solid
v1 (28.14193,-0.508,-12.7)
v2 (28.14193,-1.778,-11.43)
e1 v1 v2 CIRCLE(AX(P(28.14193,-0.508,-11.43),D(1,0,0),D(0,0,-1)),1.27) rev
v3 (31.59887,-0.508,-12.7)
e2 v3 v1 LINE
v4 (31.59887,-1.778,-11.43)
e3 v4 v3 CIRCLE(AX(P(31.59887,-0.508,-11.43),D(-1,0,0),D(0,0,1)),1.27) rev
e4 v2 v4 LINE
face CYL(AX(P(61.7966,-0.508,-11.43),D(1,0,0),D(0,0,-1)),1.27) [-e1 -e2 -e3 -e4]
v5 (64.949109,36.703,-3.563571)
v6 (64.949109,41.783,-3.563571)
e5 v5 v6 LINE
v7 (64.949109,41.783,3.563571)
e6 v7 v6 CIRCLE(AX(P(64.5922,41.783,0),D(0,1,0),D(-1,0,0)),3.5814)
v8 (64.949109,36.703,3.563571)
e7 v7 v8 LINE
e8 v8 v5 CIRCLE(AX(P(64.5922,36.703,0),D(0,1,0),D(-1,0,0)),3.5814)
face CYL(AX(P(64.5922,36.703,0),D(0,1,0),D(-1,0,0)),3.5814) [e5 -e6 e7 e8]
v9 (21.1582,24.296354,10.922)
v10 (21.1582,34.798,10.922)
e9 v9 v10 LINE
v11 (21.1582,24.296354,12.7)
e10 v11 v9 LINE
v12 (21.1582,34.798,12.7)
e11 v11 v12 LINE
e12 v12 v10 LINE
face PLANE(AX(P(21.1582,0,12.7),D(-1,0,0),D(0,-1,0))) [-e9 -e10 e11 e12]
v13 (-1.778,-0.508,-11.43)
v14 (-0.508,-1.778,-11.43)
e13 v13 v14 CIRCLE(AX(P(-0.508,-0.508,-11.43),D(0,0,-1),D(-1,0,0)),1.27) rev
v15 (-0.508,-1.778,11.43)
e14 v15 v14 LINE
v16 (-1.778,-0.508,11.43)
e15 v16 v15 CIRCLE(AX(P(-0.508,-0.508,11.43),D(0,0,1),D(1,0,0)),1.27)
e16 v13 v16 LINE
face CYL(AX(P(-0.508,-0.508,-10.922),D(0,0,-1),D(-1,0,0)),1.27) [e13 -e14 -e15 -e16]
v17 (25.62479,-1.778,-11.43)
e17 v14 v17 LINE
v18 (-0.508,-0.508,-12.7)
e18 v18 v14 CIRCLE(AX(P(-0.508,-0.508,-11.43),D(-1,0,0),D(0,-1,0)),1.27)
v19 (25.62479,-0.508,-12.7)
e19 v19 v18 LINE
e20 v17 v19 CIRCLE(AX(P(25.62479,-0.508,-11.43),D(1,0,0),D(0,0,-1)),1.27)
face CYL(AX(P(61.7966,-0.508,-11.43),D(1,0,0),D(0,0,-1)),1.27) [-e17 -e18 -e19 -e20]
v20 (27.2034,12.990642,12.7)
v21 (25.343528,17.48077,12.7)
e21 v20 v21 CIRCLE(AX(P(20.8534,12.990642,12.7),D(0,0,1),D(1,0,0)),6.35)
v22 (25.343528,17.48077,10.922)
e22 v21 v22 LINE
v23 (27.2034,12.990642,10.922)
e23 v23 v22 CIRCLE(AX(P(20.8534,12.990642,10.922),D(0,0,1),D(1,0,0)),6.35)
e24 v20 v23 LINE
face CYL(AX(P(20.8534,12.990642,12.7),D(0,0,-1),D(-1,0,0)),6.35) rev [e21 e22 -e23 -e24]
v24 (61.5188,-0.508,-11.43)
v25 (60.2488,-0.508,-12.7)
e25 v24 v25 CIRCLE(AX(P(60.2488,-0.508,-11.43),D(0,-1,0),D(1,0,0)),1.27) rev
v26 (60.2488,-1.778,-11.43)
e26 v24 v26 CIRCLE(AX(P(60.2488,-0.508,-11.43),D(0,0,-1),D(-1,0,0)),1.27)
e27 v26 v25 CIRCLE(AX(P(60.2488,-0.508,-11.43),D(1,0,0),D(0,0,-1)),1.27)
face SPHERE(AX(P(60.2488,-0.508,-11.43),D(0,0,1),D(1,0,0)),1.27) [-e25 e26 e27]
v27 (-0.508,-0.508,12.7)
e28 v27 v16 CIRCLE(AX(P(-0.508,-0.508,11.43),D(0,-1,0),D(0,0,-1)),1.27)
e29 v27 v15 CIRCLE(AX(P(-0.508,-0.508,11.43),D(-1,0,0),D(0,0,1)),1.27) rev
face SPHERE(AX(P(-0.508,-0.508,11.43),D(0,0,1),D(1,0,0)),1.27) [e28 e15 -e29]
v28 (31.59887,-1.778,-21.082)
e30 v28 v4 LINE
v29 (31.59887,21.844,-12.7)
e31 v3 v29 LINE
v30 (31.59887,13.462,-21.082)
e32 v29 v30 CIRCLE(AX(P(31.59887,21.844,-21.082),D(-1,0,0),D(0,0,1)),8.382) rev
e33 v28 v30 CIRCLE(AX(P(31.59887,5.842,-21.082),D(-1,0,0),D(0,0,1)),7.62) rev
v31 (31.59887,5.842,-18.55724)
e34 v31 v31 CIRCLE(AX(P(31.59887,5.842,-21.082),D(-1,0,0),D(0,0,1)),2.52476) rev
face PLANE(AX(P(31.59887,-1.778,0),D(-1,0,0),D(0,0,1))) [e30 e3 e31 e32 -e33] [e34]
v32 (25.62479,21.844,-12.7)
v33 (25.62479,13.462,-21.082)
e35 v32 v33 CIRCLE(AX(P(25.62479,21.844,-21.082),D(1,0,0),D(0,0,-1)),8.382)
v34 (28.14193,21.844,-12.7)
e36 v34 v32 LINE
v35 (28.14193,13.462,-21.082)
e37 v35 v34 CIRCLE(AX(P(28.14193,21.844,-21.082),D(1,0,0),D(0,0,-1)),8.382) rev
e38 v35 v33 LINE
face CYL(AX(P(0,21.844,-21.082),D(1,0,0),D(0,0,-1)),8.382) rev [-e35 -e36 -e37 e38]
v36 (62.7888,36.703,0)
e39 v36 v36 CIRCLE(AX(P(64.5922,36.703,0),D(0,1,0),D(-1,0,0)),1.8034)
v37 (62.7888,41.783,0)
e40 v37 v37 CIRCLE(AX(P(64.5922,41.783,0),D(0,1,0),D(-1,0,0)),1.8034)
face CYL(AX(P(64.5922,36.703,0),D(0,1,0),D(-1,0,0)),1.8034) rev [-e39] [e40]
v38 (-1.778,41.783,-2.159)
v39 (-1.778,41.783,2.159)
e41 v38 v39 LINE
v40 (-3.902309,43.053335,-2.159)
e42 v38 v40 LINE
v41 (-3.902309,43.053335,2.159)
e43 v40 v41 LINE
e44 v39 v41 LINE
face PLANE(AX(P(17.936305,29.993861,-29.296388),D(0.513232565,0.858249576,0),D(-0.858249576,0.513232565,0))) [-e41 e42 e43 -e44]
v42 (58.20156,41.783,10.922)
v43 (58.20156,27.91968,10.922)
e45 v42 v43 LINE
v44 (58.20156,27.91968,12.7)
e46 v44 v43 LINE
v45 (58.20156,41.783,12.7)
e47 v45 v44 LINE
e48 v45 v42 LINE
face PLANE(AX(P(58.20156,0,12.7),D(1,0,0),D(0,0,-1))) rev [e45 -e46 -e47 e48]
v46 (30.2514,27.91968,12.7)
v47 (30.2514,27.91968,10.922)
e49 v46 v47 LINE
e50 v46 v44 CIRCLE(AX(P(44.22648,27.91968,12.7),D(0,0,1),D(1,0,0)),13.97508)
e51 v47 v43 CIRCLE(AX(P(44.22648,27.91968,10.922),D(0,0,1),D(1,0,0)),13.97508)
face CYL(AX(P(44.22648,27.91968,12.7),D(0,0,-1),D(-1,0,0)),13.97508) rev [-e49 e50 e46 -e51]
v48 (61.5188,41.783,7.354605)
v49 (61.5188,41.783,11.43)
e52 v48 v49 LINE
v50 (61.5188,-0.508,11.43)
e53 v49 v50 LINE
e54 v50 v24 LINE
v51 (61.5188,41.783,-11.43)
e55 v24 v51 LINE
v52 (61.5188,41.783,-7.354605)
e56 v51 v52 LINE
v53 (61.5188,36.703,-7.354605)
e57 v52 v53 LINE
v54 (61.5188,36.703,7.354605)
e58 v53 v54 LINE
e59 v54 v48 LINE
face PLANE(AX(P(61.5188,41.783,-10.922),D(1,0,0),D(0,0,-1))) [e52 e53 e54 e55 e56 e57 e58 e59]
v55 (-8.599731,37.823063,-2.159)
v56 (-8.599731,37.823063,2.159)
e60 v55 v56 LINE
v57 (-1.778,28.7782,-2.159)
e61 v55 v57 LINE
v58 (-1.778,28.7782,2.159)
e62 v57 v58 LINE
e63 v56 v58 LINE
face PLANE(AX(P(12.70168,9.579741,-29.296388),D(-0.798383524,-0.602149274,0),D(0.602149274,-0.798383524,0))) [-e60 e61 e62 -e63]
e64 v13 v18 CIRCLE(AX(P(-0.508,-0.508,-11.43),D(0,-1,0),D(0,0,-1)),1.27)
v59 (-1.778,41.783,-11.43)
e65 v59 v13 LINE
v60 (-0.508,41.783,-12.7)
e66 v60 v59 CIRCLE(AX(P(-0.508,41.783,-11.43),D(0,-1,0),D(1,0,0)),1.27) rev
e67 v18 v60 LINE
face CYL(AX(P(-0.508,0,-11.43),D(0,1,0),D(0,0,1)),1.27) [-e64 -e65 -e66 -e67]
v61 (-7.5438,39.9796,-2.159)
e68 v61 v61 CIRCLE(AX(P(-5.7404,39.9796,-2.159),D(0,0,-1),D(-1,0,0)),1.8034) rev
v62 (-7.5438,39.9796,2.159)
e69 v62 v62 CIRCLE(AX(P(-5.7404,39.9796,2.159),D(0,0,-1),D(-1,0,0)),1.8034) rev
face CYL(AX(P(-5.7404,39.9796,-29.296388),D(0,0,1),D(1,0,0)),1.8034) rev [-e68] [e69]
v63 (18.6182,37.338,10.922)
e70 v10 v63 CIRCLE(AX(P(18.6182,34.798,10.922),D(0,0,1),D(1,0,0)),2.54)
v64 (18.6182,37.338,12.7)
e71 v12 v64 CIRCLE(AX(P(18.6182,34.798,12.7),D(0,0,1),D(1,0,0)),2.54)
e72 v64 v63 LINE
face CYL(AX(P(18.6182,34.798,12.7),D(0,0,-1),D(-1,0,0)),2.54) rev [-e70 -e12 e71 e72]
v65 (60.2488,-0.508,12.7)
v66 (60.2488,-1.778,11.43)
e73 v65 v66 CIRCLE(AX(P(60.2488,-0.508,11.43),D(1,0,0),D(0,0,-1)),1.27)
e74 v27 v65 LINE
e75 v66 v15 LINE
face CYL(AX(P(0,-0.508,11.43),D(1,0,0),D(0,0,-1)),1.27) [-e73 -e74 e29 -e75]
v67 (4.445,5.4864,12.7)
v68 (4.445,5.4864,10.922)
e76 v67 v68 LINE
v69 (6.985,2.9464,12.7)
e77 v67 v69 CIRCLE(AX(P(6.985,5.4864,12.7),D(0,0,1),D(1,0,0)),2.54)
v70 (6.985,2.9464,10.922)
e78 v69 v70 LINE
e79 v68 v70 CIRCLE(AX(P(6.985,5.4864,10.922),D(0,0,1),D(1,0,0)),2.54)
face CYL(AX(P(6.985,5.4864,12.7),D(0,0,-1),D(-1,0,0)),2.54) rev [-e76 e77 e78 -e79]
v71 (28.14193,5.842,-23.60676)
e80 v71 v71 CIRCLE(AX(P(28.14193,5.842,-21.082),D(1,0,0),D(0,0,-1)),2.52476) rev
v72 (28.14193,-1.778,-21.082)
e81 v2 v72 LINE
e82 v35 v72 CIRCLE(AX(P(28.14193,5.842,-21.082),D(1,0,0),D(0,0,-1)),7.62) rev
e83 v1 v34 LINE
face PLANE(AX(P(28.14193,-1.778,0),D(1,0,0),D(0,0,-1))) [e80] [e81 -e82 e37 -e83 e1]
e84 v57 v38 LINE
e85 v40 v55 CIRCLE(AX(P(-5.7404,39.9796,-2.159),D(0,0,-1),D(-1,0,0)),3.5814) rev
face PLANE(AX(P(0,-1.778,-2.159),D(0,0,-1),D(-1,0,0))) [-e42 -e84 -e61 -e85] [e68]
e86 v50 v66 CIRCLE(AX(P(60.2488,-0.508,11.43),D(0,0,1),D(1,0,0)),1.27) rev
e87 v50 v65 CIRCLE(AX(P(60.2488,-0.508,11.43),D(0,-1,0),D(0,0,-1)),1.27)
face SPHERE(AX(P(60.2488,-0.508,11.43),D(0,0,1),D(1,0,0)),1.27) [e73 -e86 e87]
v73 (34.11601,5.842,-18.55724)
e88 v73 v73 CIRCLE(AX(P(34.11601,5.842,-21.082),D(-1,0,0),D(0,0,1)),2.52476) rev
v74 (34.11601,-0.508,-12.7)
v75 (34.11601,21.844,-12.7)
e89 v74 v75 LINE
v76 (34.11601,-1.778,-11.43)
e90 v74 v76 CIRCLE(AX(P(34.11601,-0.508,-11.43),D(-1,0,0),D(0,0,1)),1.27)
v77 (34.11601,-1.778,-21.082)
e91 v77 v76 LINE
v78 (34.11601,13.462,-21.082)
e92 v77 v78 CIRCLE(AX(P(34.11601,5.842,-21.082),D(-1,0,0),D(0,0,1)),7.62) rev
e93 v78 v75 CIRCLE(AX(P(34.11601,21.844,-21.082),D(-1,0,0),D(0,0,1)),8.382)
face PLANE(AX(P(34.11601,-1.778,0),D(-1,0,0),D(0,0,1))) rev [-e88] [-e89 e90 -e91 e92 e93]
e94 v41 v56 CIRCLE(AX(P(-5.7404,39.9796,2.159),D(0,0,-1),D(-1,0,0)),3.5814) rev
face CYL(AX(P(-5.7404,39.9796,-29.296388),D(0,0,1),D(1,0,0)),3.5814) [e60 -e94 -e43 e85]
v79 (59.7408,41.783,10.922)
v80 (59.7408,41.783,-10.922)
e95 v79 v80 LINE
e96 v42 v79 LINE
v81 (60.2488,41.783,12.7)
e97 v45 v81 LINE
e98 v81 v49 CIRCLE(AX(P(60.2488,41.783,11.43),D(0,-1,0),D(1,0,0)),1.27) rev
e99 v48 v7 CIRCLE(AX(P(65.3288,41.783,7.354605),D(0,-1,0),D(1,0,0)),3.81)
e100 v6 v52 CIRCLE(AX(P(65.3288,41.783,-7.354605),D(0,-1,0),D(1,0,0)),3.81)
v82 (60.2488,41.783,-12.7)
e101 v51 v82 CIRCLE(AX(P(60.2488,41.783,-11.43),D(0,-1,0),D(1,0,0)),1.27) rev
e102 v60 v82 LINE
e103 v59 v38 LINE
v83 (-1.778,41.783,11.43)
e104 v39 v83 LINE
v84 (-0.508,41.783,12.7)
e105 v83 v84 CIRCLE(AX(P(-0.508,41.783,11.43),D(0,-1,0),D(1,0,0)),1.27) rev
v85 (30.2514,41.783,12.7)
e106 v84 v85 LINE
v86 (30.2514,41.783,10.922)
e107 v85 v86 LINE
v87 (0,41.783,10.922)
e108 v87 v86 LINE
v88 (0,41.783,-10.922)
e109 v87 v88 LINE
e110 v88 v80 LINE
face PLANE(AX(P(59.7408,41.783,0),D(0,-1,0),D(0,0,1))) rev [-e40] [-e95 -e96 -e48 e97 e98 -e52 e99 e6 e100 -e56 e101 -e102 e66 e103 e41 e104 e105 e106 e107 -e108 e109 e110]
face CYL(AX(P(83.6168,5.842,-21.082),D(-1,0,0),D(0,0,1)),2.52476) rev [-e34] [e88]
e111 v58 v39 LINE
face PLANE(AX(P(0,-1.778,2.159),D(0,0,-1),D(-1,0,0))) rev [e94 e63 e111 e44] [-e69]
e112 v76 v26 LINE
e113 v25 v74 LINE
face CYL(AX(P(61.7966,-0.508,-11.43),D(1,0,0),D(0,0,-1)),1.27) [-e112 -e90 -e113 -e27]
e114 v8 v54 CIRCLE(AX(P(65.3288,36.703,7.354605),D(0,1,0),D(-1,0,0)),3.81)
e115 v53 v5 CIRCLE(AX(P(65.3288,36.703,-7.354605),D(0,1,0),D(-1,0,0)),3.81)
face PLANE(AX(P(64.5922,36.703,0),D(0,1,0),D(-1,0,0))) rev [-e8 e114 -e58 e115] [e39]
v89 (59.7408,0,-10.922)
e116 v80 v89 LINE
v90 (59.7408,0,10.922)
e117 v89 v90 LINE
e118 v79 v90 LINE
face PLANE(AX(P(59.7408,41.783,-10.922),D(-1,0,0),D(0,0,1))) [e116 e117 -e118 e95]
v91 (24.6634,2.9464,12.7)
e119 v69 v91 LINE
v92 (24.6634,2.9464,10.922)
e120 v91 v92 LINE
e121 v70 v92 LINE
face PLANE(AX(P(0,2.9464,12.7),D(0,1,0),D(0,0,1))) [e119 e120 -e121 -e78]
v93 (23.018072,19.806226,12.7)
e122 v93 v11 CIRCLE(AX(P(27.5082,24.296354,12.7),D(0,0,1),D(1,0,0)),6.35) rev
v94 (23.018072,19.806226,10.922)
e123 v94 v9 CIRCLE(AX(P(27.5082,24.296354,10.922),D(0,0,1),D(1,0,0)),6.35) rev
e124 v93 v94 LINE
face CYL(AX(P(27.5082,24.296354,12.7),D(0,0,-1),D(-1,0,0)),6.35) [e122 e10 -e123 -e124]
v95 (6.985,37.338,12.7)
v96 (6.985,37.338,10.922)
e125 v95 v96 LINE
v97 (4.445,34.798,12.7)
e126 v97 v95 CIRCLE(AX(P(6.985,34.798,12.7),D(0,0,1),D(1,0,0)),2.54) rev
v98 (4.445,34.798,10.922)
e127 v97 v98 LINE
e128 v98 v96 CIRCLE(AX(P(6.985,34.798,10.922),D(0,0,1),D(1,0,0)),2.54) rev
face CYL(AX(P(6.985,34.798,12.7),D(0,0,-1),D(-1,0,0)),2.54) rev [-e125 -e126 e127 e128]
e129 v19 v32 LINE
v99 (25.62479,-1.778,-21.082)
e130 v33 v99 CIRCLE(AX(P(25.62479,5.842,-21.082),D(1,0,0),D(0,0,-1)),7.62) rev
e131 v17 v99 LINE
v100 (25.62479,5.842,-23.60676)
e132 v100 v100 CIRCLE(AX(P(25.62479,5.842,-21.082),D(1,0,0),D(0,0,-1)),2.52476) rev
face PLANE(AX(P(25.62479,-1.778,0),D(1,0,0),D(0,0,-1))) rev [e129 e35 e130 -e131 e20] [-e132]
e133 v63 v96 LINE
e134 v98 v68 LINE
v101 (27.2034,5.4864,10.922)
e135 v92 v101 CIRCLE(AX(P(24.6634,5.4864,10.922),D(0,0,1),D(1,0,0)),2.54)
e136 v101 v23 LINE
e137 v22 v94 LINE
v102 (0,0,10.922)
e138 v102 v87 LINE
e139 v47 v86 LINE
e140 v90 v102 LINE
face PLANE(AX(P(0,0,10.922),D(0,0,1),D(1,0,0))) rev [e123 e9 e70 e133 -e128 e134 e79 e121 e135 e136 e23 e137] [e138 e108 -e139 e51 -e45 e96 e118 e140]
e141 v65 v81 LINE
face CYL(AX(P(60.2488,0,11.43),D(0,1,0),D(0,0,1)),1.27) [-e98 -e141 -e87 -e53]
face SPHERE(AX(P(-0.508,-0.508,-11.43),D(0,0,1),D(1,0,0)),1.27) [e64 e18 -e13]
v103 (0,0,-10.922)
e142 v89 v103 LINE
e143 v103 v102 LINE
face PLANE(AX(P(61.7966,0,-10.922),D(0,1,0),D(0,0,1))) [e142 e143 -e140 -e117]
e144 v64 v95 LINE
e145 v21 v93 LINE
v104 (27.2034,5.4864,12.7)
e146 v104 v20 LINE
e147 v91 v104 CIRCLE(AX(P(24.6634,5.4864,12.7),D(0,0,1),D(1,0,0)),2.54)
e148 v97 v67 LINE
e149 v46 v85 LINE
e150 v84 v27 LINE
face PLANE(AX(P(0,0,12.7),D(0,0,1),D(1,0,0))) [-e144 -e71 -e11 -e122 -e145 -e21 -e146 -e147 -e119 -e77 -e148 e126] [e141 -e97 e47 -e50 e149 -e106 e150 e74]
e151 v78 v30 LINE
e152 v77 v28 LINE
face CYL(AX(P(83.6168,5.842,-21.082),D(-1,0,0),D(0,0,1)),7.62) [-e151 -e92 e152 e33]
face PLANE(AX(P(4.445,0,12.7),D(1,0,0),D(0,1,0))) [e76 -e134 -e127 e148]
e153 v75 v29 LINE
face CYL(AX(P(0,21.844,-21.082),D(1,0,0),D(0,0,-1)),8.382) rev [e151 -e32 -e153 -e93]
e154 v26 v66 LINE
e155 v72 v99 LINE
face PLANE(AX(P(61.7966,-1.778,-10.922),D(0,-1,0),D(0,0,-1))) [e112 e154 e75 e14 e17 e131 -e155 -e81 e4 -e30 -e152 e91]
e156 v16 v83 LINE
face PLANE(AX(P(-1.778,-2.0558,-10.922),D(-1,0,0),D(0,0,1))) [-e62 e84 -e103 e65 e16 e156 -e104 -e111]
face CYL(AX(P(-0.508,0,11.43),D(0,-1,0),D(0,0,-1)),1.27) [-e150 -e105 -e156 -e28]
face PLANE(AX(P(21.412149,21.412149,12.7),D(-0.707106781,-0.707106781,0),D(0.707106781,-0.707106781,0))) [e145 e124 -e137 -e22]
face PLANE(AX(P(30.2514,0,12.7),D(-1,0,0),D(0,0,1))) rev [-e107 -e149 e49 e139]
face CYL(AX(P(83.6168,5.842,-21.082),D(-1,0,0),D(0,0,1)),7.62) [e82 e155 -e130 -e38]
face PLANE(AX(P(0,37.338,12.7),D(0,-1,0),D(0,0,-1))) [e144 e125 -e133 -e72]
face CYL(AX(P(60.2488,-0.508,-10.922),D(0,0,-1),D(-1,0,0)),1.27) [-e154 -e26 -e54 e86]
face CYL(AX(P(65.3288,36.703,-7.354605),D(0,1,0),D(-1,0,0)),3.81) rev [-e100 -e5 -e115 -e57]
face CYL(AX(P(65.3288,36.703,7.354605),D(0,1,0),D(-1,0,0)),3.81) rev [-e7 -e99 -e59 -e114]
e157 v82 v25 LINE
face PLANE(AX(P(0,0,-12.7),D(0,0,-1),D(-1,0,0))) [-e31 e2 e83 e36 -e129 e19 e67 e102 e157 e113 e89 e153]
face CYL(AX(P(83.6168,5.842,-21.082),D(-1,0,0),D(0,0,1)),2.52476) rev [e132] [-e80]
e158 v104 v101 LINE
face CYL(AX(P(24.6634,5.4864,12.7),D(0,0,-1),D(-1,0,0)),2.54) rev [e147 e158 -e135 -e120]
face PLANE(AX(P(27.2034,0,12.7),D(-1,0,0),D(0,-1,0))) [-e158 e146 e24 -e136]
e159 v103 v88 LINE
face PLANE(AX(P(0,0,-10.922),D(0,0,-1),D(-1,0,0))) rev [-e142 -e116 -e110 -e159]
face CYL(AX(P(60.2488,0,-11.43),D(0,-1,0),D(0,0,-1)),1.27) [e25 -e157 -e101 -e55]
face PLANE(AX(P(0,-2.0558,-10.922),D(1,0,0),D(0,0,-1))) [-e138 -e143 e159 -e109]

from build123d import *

# Parameters (mm, degrees)
SKETCH3_W               = 1.778
SKETCH3_H               = 21.844
SKETCH4_W               = 63.2968
SKETCH4_H               = 43.561
BOSS_EXTRUDE1_DEPTH     = 1.778
BOSS_EXTRUDE2_DEPTH     = 1.778
SKETCH6_R               = 1.8034
BOSS_EXTRUDE3_DEPTH     = 5.08
FILLET2_R               = 3.81
SKETCH7_R               = 1.8034
BOSS_EXTRUDE4_DEPTH     = 25.4
CUT_EXTRUDE1_DEPTH      = 82.893164904
CUT_EXTRUDE1_DEPTH_BACK = 82.893164904
SKETCH8_W               = 7.5438
SKETCH8_H               = 10.541
SKETCH13_R              = 2.52476
BOSS_EXTRUDE5_DEPTH     = 63.2968
SKETCH14_W              = 27.40279
SKETCH14_H              = 7.62
SKETCH14_H_2            = 8.382
SKETCH14_W_2            = 3.45694
CUT_EXTRUDE2_DEPTH      = 80.858589657
FILLET3_R               = 8.382
FILLET4_R               = 1.27


# Some blends are built 0.0001 mm under size
with BuildPart() as part:
    # Sweep1: sweep along a path in Sketch1
    with BuildLine(Plane.XY) as sweep1_path:
        Line((0, 41.783), (0, 0))
        Line((0, 0), (59.7408, 0))
        Line((59.7408, 0), (59.7408, 41.783))
    # Sketch3 → Sweep1 (sweep)
    with BuildSketch(Plane(origin=(0, 41.783, 0), x_dir=(1, 0, 0), z_dir=(0, 1, 0))):
        with Locations((-0.889, 0)):
            Rectangle(SKETCH3_W, SKETCH3_H)
    sweep(path=sweep1_path.line, transition=Transition.RIGHT)

    # Sketch4 → Boss-Extrude1 (add)
    with BuildSketch(Plane(origin=(0, 0, -10.922), x_dir=(-1, 0, 0), z_dir=(0, 0, -1))):
        with Locations((-29.8704, 20.0025)):
            Rectangle(SKETCH4_W, SKETCH4_H)
    extrude(amount=BOSS_EXTRUDE1_DEPTH)

    # Sketch5 → Boss-Extrude2 (add)
    # profile 1 of 2: a face of its own
    with BuildSketch(Plane.XY.offset(10.922)):
        with BuildLine():
            Line((30.2514, 41.783), (0, 41.783))
            Line((0, 41.783), (0, 0))
            Line((0, 0), (59.7408, 0))
            Line((59.7408, 0), (59.7408, 41.783))
            Line((59.7408, 41.783), (58.20156, 41.783))
            Line((58.20156, 41.783), (58.20156, 27.91968))
            ThreePointArc((58.20156, 27.91968), (44.22648, 13.9446), (30.2514, 27.91968))
            Line((30.2514, 27.91968), (30.2514, 41.783))
        make_face()
        with BuildLine():
            Line((4.445, 5.4864), (4.445, 34.798))
            ThreePointArc((4.445, 34.798), (5.188948776, 36.594051224), (6.985, 37.338))
            Line((6.985, 37.338), (18.6182, 37.338))
            ThreePointArc((18.6182, 37.338), (20.414251224, 36.594051224), (21.1582, 34.798))
            Line((21.1582, 34.798), (21.1582, 24.296354404))
            ThreePointArc((21.1582, 24.296354404), (21.641564969, 21.866314608), (23.018071939, 19.806226343))
            Line((23.018071939, 19.806226343), (25.343528061, 17.480770222))
            ThreePointArc((25.343528061, 17.480770222), (26.720035031, 15.420681957), (27.2034, 12.990642162))
            Line((27.2034, 12.990642162), (27.2034, 5.4864))
            ThreePointArc((27.2034, 5.4864), (26.459451224, 3.690348776), (24.6634, 2.9464))
            Line((24.6634, 2.9464), (6.985, 2.9464))
            ThreePointArc((6.985, 2.9464), (5.188948776, 3.690348776), (4.445, 5.4864))
        make_face(mode=Mode.SUBTRACT)
    # profile 2 of 2: a face of its own
    with BuildSketch(Plane.XY.offset(10.922)):
        Polygon((61.5188, 41.783), (59.7408, 41.783), (59.7408, 0), (0, 0), (0, 41.783), (-1.778, 41.783), (-1.778, -1.778), (61.5188, -1.778), align=None)
    extrude(amount=BOSS_EXTRUDE2_DEPTH)

    # Sketch6 → Boss-Extrude3 (add)
    with BuildSketch(Plane(origin=(0, 41.783, 0), x_dir=(1, 0, 0), z_dir=(0, 1, 0))):
        with BuildLine():
            Line((64.5922, 3.5814), (61.5188, 3.5814))
            Line((61.5188, 3.5814), (61.5188, -3.5814))
            Line((61.5188, -3.5814), (64.5922, -3.5814))
            ThreePointArc((64.5922, -3.5814), (68.1736, 0), (64.5922, 3.5814))
        make_face()
        with Locations(Location((64.5922, 0, 0), (0, 0, 180))):
            Circle(SKETCH6_R, mode=Mode.SUBTRACT)
    extrude(amount=-BOSS_EXTRUDE3_DEPTH)

    # Fillet2
    # the kernel refuses this fillet: 3.81 mm, written as the material it adds along each edge
    with BuildSketch(Plane(origin=(61.5188, 41.783, -3.5814), x_dir=(0, 0, -1), z_dir=(0, -1, 0))) as fillet2_piece_1:
        with BuildLine():
            CenterArc((3.773204979, 3.81), FILLET2_R, 185.719382358, 84.280617642)
            Line((-0.017828515, 3.430309278), (-0.396931865, 3.392340206))
            ThreePointArc((-0.396931865, 3.392340206), (-0.381, 3.0734), (-0.381, 0))
            Line((-0.381, 0), (0, -0.381))
            Line((0, -0.381), (3.773204979, -0.381))
            Line((3.773204979, -0.381), (3.773204979, 0))
        make_face()
    extrude(amount=5.08)
    with BuildSketch(Plane(origin=(61.5188, 41.783, 3.5814), x_dir=(0, 0, 1), z_dir=(0, -1, 0))) as fillet2_piece_2:
        with BuildLine():
            CenterArc((3.773204979, -3.81), FILLET2_R, 90, 84.280617642)
            Line((-0.017828515, -3.430309278), (-0.396931865, -3.392340206))
            ThreePointArc((-0.396931865, -3.392340206), (-0.381, -3.0734), (-0.381, 0))
            Line((-0.381, 0), (0, 0.381))
            Line((0, 0.381), (3.773204979, 0.381))
            Line((3.773204979, 0.381), (3.773204979, 0))
        make_face()
    extrude(amount=5.08)

    # Sketch7 → Boss-Extrude4 (add)
    with BuildSketch(Plane.XY.offset(12.7)):
        with BuildLine():
            Line((-1.778, 36.3982), (-1.778, 41.783))
            Line((-1.778, 41.783), (-3.902308892, 43.053335031))
            ThreePointArc((-3.902308892, 43.053335031), (-8.404920605, 42.372664125), (-8.599730754, 37.82306259))
            Line((-8.599730754, 37.82306259), (-1.778, 28.7782))
            Line((-1.778, 28.7782), (-1.778, 36.3982))
        make_face()
        with Locations((-5.7404, 39.9796)):
            Circle(SKETCH7_R, mode=Mode.SUBTRACT)
    extrude(amount=-BOSS_EXTRUDE4_DEPTH)

    # Sketch8 → Cut-Extrude1 (cut, two sides: drawn at the far end of the back side and taken through both)
    with BuildSketch(Plane(origin=(0, 41.783, 0), x_dir=(1, 0, 0), z_dir=(0, 1, 0)).offset(-CUT_EXTRUDE1_DEPTH_BACK)):
        with Locations((-5.5499, 7.4295)):
            Rectangle(SKETCH8_W, SKETCH8_H)
        with Locations((-5.5499, -7.4295)):
            Rectangle(SKETCH8_W, SKETCH8_H)
    extrude(amount=CUT_EXTRUDE1_DEPTH + CUT_EXTRUDE1_DEPTH_BACK, mode=Mode.SUBTRACT)

    # Sketch13 → Boss-Extrude5 (add)
    with BuildSketch(Plane.ZY.offset(1.778)):
        with BuildLine():
            Line((-21.082, -1.778), (-12.7, -1.778))
            Line((-12.7, -1.778), (-12.7, 13.462))
            Line((-12.7, 13.462), (-21.082, 13.462))
            ThreePointArc((-21.082, 13.462), (-28.702, 5.842), (-21.082, -1.778))
        make_face()
        with Locations((-21.082, 5.842)):
            Circle(SKETCH13_R, mode=Mode.SUBTRACT)
    extrude(amount=-BOSS_EXTRUDE5_DEPTH)

    # Sketch14 → Cut-Extrude2 (cut, through all)
    with BuildSketch(Plane(origin=(0, 13.462, 0), x_dir=(1, 0, 0), z_dir=(0, 1, 0))):
        with Locations((11.923395, 24.892)):
            Rectangle(SKETCH14_W, SKETCH14_H)
        with Locations((11.923395, 16.891)):
            Rectangle(SKETCH14_W, SKETCH14_H_2)
        with Locations((47.817405, 16.891)):
            Rectangle(SKETCH14_W, SKETCH14_H_2)
        with Locations((47.817405, 24.892)):
            Rectangle(SKETCH14_W, SKETCH14_H)
        with Locations((29.8704, 24.892)):
            Rectangle(SKETCH14_W_2, SKETCH14_H)
        with Locations((29.8704, 16.891)):
            Rectangle(SKETCH14_W_2, SKETCH14_H_2)
    extrude(amount=-CUT_EXTRUDE2_DEPTH, mode=Mode.SUBTRACT)

    # Fillet3
    fillet3_edges = [part.edges().sort_by_distance(p)[0] for p in [
        (26.88336, 13.462, -12.7),
        (32.85744, 13.462, -12.7),
    ]]
    fillet(fillet3_edges, radius=FILLET3_R - 0.0001)  # a hair under: the kernel refuses the full size

    # Fillet4
    fillet4_edges = [part.edges().sort_by_distance(p)[0] for p in [
        (61.5188, -1.778, 0),
        (-1.778, 20.0025, 12.7),
        (-1.778, -1.778, 0),
        (-1.778, 20.0025, -12.7),
        (11.923395, -1.778, -12.7),
        (47.817405, -1.778, -12.7),
        (29.8704, -1.778, -12.7),
        (61.5188, 20.0025, -12.7),
        (29.8704, -1.778, 12.7),
        (61.5188, 20.0025, 12.7),
    ]]
    fillet(fillet4_edges, radius=FILLET4_R)


solid = part.part
